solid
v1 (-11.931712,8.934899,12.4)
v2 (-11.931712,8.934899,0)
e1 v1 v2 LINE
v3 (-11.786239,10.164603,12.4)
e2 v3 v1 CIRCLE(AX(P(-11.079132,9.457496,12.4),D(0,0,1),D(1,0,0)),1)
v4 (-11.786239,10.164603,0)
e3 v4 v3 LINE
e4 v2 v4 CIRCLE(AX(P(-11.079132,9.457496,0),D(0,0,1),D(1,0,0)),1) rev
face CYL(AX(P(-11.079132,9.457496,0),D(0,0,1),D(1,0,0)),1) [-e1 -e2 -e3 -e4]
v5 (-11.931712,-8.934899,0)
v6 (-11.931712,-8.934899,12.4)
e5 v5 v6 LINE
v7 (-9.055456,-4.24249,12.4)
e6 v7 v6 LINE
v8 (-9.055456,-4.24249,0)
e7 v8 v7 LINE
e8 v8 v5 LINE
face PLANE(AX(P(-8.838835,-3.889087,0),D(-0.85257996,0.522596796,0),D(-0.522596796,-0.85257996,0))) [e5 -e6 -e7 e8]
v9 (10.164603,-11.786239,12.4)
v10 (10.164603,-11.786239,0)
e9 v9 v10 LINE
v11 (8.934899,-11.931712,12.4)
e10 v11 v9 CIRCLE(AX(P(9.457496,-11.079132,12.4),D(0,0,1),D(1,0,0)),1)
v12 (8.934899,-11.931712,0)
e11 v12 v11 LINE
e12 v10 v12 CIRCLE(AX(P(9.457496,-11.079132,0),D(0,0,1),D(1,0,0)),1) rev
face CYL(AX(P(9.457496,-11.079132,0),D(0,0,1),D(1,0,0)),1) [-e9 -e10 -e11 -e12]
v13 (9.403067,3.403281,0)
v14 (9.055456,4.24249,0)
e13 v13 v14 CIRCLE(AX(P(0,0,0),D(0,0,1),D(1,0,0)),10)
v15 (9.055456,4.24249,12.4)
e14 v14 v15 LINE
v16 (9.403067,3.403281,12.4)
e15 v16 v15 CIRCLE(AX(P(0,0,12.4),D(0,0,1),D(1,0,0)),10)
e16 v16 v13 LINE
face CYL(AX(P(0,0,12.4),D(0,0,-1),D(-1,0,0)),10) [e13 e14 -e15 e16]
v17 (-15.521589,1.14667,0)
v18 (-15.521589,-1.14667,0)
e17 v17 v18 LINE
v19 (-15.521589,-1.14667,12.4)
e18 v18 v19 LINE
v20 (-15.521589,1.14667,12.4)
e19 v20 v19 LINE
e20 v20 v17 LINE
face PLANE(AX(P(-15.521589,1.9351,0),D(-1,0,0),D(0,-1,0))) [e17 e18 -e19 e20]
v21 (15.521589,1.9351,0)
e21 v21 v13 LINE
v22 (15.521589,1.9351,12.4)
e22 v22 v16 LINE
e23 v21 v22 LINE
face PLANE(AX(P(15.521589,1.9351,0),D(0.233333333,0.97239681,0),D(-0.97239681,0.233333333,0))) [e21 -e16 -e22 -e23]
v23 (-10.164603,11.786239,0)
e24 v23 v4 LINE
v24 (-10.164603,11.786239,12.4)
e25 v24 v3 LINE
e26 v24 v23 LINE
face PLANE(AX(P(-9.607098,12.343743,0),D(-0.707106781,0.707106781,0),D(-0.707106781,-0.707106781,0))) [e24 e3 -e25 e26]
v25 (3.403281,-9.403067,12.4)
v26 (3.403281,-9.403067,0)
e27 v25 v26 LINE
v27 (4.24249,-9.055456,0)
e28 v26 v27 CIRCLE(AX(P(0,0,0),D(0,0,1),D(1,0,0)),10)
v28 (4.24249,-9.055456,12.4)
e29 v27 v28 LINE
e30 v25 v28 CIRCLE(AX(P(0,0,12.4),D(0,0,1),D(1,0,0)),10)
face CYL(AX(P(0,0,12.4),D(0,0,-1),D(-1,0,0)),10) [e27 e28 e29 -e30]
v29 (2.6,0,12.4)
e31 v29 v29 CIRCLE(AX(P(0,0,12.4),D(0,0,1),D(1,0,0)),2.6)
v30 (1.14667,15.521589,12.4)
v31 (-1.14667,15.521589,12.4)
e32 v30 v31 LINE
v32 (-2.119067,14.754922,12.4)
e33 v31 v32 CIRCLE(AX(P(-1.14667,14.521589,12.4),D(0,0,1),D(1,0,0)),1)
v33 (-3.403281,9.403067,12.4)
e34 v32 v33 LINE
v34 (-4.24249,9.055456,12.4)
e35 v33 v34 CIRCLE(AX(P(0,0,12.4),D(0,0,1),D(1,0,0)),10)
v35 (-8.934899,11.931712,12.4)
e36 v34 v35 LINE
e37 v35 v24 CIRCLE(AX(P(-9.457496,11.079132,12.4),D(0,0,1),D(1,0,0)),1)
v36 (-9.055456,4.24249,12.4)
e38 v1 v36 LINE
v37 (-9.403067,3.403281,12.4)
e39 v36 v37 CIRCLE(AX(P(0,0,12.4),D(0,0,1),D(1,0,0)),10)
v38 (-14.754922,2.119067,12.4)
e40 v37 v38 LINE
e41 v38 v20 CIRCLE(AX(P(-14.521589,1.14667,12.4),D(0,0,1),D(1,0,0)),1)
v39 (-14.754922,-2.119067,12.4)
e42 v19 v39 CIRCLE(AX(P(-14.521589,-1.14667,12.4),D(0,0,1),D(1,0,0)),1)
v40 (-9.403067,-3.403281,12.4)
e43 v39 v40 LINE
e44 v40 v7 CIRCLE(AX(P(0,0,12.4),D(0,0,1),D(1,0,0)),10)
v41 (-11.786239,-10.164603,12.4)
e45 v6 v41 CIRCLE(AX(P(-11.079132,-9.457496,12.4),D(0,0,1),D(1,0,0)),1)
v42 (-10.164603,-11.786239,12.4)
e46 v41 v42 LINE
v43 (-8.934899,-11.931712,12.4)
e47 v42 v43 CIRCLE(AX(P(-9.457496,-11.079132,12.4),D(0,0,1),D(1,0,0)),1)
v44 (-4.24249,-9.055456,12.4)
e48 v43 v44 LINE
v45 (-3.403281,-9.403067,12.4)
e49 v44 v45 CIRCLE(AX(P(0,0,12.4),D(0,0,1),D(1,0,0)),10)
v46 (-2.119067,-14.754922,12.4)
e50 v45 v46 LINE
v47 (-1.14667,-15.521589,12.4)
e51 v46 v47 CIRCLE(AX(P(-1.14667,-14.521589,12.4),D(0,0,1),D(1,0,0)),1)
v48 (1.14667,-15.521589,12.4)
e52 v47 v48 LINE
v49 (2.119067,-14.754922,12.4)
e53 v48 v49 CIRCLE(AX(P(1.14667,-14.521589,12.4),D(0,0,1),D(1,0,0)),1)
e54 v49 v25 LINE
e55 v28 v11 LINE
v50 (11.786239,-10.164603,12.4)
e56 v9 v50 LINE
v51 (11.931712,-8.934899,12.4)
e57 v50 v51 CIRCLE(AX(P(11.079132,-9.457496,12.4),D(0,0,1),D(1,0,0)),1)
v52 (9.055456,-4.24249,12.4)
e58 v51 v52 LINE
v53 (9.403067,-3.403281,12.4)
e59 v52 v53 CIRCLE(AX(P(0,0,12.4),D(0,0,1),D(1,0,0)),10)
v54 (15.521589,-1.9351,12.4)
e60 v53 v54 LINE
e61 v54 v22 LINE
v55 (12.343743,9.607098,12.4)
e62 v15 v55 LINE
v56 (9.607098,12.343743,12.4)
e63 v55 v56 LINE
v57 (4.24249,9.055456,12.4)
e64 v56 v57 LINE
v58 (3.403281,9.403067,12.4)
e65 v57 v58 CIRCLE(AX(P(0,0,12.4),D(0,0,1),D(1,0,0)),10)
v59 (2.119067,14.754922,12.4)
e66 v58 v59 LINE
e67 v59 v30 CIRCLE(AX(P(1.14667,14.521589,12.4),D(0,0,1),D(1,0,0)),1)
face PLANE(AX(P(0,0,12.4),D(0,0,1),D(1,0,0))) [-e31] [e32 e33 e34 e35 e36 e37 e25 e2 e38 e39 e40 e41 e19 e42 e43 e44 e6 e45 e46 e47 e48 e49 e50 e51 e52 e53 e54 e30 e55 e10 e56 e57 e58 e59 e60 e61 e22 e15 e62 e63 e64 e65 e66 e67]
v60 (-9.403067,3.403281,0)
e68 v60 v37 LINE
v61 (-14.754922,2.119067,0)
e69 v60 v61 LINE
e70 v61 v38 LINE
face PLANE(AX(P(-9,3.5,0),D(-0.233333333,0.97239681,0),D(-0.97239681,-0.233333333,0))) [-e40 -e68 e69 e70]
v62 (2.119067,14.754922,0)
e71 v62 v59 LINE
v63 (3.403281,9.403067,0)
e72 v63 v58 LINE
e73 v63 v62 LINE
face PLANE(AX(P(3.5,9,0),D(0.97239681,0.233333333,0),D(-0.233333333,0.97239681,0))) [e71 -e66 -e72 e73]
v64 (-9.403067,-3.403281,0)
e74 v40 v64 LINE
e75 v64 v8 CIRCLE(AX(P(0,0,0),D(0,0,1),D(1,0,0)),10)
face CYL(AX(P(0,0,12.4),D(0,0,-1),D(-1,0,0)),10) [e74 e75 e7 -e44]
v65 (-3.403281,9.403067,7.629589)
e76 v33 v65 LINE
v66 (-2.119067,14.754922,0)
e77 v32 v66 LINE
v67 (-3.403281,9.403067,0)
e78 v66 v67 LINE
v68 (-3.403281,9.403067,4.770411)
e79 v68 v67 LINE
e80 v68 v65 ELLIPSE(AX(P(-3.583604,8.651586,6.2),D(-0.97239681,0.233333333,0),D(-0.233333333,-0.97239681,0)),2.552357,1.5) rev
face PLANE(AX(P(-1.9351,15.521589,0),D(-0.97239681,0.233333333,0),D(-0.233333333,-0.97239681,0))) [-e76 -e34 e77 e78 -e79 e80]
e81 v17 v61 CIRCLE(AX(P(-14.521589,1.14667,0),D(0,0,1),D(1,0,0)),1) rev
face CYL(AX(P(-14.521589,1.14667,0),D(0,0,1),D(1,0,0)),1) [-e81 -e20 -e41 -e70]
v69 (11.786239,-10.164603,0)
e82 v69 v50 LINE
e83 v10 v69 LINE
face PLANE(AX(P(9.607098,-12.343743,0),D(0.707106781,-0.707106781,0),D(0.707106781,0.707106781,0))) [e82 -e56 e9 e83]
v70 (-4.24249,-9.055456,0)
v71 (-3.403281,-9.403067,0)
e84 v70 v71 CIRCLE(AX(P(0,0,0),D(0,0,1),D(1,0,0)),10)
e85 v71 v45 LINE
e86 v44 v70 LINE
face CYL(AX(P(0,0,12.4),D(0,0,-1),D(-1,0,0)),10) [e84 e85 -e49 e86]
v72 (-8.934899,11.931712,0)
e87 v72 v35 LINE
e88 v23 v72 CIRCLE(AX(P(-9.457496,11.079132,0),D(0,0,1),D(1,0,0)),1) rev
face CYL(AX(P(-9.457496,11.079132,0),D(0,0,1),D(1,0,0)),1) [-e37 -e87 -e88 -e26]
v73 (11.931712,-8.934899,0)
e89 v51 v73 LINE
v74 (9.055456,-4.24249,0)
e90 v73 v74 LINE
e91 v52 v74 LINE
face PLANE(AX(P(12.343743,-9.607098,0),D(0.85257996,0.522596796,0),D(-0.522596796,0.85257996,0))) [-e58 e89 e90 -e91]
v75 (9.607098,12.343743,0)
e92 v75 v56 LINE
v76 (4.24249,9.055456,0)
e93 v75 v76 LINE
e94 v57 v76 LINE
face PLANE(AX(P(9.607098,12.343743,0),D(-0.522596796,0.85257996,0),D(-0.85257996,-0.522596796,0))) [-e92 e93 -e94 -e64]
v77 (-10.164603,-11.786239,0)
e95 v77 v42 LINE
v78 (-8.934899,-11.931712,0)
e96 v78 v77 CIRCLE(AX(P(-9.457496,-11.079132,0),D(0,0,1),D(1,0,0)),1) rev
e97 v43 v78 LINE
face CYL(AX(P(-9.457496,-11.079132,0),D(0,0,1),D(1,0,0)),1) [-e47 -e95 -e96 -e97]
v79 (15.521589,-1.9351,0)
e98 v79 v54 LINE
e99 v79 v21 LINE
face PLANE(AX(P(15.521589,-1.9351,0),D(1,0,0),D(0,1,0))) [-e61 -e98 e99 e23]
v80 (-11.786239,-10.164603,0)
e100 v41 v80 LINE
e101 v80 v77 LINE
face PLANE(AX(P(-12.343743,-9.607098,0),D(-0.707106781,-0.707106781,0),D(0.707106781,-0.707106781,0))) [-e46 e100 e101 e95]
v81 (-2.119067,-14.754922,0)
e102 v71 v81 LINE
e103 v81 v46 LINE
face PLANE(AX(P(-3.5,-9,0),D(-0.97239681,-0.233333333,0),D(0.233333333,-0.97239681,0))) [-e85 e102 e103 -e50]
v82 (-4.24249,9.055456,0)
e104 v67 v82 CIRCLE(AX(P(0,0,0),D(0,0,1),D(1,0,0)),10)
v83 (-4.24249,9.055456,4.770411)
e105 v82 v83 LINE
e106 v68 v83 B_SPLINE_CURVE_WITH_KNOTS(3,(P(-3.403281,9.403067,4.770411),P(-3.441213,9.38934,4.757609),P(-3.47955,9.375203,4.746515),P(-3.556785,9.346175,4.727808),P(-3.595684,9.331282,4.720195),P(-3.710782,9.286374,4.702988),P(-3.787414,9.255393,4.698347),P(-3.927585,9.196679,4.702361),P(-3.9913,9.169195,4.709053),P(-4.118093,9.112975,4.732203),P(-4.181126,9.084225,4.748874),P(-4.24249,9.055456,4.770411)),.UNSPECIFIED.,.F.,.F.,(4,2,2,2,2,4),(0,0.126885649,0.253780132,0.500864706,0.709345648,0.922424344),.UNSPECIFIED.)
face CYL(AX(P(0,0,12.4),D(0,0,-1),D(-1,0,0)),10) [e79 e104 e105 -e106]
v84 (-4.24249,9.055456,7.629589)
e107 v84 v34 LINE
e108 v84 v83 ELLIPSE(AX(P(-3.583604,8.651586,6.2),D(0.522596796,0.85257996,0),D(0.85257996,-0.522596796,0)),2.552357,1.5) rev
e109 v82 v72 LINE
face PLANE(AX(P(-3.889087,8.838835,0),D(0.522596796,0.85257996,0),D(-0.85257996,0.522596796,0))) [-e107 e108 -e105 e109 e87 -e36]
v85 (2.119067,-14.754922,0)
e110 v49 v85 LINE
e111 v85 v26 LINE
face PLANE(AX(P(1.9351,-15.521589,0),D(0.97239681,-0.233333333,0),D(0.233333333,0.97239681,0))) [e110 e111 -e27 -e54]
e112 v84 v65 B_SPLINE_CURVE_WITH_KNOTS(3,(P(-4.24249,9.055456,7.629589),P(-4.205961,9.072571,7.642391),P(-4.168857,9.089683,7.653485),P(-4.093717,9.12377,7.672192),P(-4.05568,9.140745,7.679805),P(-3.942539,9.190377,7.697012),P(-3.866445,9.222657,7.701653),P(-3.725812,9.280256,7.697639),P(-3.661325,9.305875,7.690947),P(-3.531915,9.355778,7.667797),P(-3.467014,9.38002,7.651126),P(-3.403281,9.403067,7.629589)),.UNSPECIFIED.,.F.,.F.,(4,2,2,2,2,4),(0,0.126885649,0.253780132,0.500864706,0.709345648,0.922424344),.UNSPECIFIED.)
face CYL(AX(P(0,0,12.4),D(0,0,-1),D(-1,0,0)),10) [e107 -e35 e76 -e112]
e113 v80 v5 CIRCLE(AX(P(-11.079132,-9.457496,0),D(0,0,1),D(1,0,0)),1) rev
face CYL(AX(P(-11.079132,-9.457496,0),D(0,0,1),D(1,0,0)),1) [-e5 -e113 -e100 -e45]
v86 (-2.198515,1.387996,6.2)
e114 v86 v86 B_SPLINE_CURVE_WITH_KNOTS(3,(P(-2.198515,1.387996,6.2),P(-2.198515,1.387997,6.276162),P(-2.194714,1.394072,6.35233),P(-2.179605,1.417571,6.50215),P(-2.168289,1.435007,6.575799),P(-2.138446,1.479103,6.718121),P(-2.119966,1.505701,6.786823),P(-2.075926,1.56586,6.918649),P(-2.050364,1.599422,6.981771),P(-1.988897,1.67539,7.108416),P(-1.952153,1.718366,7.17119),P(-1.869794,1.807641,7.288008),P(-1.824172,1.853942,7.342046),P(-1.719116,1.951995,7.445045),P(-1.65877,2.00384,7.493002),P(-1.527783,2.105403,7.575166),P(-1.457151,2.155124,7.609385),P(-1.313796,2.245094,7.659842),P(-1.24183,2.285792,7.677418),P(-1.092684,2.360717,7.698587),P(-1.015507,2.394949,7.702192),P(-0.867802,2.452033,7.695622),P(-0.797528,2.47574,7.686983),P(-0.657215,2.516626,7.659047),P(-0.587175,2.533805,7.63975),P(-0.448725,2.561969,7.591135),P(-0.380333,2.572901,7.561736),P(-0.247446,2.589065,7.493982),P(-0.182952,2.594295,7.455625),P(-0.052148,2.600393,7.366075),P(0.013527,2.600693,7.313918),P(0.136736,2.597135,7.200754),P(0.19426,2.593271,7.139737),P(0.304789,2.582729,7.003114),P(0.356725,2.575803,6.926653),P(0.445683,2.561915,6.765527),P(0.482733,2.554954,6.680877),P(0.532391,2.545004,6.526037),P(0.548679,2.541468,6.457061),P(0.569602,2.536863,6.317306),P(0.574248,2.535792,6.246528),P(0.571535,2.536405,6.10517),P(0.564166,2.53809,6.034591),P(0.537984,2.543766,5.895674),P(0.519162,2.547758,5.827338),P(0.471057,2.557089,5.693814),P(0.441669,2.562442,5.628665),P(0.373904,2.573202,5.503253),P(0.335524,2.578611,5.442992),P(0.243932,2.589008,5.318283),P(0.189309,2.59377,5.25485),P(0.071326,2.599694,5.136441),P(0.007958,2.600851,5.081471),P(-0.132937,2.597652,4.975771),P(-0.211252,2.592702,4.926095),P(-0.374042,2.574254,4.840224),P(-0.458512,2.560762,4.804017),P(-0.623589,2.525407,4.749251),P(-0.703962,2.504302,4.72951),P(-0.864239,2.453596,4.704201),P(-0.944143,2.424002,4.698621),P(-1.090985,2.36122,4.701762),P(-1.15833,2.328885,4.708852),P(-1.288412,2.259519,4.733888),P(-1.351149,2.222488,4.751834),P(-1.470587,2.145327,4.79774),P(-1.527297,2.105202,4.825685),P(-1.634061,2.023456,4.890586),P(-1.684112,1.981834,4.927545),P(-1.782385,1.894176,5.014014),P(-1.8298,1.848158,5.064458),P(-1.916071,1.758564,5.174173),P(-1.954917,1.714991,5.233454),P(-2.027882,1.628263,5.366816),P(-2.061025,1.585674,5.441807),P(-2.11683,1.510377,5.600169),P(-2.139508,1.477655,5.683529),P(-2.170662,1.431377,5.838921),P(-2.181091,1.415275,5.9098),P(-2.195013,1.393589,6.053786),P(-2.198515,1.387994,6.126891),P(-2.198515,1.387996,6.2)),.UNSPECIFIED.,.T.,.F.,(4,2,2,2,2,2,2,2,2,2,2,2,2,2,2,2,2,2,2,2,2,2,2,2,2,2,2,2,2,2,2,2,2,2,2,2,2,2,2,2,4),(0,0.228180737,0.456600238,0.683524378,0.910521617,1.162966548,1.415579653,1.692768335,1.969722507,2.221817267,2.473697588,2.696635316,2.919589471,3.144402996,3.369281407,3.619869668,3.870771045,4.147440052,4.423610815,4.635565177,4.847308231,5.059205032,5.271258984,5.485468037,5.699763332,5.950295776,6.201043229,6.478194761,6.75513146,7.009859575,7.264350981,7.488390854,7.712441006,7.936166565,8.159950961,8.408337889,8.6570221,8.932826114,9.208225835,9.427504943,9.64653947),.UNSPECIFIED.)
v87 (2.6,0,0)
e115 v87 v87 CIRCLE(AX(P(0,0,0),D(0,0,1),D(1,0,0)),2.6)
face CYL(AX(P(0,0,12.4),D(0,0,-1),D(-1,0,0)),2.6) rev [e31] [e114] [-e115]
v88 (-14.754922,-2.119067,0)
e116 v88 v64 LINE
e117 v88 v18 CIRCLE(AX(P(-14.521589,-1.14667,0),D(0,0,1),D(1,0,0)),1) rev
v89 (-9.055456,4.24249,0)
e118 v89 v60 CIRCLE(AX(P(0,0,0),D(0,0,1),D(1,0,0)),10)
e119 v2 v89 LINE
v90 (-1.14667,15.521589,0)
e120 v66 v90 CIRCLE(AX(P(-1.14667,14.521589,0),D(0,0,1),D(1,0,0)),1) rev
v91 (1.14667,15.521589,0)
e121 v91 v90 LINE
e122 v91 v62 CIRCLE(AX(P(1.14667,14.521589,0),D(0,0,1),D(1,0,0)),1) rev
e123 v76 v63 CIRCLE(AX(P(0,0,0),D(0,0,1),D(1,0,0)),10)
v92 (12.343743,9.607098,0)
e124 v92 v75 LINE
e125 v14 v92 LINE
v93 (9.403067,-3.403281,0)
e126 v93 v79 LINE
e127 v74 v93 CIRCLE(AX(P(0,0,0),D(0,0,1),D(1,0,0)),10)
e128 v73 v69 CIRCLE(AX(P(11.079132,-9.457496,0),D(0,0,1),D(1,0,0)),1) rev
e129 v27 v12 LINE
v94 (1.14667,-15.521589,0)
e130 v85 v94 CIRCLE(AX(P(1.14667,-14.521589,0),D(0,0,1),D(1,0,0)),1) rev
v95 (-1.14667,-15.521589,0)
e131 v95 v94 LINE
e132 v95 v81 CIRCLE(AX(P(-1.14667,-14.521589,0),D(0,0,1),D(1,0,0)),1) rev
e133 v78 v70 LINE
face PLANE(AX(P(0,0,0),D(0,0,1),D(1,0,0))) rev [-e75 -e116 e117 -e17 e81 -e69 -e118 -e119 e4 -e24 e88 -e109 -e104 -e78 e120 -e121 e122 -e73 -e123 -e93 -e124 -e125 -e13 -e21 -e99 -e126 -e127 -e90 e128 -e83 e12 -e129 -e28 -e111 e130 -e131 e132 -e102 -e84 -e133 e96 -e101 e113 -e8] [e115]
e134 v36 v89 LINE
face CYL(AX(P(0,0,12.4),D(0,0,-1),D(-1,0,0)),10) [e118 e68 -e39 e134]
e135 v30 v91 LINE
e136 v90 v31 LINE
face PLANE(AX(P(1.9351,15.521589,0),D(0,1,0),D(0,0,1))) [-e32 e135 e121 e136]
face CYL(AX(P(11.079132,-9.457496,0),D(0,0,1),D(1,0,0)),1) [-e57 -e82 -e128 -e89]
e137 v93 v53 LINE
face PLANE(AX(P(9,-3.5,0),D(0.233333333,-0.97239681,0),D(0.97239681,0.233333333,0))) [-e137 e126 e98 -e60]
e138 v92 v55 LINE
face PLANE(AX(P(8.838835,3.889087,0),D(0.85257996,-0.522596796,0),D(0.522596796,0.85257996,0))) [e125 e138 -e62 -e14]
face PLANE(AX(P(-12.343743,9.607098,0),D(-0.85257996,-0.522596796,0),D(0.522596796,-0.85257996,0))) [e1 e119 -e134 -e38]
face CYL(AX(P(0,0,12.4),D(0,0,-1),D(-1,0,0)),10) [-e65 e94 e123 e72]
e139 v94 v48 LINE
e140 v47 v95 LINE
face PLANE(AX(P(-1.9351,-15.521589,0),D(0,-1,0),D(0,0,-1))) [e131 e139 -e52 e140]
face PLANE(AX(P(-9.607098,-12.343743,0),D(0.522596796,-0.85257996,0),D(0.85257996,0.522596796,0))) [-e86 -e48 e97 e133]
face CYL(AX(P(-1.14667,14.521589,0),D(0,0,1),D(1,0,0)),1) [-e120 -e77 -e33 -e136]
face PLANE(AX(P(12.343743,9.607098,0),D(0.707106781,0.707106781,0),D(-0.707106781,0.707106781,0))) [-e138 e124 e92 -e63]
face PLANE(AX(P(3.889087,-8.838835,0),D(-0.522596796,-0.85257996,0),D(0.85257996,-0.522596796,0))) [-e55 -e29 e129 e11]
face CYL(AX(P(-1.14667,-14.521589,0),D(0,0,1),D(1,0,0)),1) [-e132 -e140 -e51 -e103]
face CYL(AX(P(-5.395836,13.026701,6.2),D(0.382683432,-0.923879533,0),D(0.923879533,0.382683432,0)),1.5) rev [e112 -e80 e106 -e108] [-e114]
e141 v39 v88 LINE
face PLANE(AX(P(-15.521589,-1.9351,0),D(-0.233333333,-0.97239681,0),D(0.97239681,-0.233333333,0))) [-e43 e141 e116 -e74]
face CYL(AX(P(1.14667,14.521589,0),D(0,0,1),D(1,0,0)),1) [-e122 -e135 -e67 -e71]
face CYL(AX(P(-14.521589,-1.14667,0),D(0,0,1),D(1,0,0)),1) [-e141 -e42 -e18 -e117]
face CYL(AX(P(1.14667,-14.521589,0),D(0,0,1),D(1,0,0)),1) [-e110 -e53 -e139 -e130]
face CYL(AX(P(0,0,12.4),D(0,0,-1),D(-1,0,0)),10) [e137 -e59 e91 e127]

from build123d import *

# Parameters (mm, degrees)
SKETCH1_R                      = 10
SKETCH1_R_2                    = 2.6
BOSS_EXTRUDE1_DEPTH            = 12.4
BOSS_EXTRUDE2_DEPTH            = 6.2
CIRPATTERN1_DEPTH              = 12.4
CUT_EXTRUDE1_REACH             = 35.782
CUT_EXTRUDE1_END_RADIUS        = 2.6
SKETCH5_R                      = 1.5
CUT_EXTRUDE1_DIRECTION_2_DEPTH = 4.1
FILLET4_R                      = 1


# Read off the part's stored shape, not the designer's step: CirPattern1
with BuildPart() as part:
    # Sketch1 → Boss-Extrude1 (new body)
    with BuildSketch(Plane.XY):
        with Locations(Location((0, 0, 0), (0, 0, 180))):
            Circle(SKETCH1_R)
        with Locations(Location((0, 0, 0), (0, 0, 180))):
            Circle(SKETCH1_R_2, mode=Mode.SUBTRACT)
    extrude(amount=BOSS_EXTRUDE1_DEPTH)

    # Sketch2 → Boss-Extrude2 (add, symmetric)
    with BuildSketch(Plane.XY.offset(6.2)):
        Polygon((-1.935099749, 15.52158862), (-3.5, 9), (3.5, 9), (1.935099749, 15.52158862), align=None)
    extrude(amount=BOSS_EXTRUDE2_DEPTH, both=True)

    # CirPattern1 outline → CirPattern1 (add)
    with BuildSketch(Plane.XY):
        with BuildLine():
            Line((-9.607098413, 12.343742723), (-12.343742723, 9.607098413))
            Line((-12.343742723, 9.607098413), (-9.055455951, 4.242489544))
            ThreePointArc((-9.055455951, 4.242489544), (-7.071067812, 7.071067812), (-4.242489544, 9.055455951))
            Line((-4.242489544, 9.055455951), (-9.607098413, 12.343742723))
        make_face()
        with BuildLine():
            ThreePointArc((4.242489544, 9.055455951), (7.071067812, 7.071067812), (9.055455951, 4.242489544))
            Line((9.055455951, 4.242489544), (12.343742723, 9.607098413))
            Line((12.343742723, 9.607098413), (9.607098413, 12.343742723))
            Line((9.607098413, 12.343742723), (4.242489544, 9.055455951))
        make_face()
        with BuildLine():
            ThreePointArc((9.403067435, 3.403281184), (10, 0), (9.403067435, -3.403281184))
            Line((9.403067435, -3.403281184), (15.52158862, -1.935099749))
            Line((15.52158862, -1.935099749), (15.52158862, 1.935099749))
            Line((15.52158862, 1.935099749), (9.403067435, 3.403281184))
        make_face()
        with BuildLine():
            ThreePointArc((9.055455951, -4.242489544), (7.071067812, -7.071067812), (4.242489544, -9.05545595))
            Line((4.242489544, -9.05545595), (9.607098413, -12.343742723))
            Line((9.607098413, -12.343742723), (12.343742723, -9.607098413))
            Line((12.343742723, -9.607098413), (9.055455951, -4.242489544))
        make_face()
        with BuildLine():
            ThreePointArc((3.403281184, -9.403067435), (0, -10), (-3.403281184, -9.403067435))
            Line((-3.403281184, -9.403067435), (-1.935099749, -15.52158862))
            Line((-1.935099749, -15.52158862), (1.935099749, -15.52158862))
            Line((1.935099749, -15.52158862), (3.403281184, -9.403067435))
        make_face()
        with BuildLine():
            ThreePointArc((-4.242489544, -9.05545595), (-7.071067812, -7.071067812), (-9.055455951, -4.242489544))
            Line((-9.055455951, -4.242489544), (-12.343742723, -9.607098413))
            Line((-12.343742723, -9.607098413), (-9.607098413, -12.343742723))
            Line((-9.607098413, -12.343742723), (-4.242489544, -9.05545595))
        make_face()
        with BuildLine():
            ThreePointArc((-9.403067435, -3.403281184), (-10, 0), (-9.403067435, 3.403281184))
            Line((-9.403067435, 3.403281184), (-15.52158862, 1.935099749))
            Line((-15.52158862, 1.935099749), (-15.52158862, -1.935099749))
            Line((-15.52158862, -1.935099749), (-9.403067435, -3.403281184))
        make_face()
    extrude(amount=CIRPATTERN1_DEPTH)

    # Cut-Extrude1: up to this cylinder (the profile starts outside it)
    cut_extrude1_end = Plane(origin=(0, 0, 6.2), z_dir=(0, 0, -1)) * Cylinder(CUT_EXTRUDE1_END_RADIUS, 77.764, mode=Mode.PRIVATE)
    # Sketch5 → Cut-Extrude1 (cut, up to the surface)
    with BuildSketch(Plane(origin=(-3.826834324, 9.238795325, 0), x_dir=(0.9238795325112892, 0.3826834323650838, 0), z_dir=(-0.3826834323650838, 0.9238795325112892, 0)), mode=Mode.PRIVATE) as cut_extrude1_sk1:
        with Locations(Location((0, -6.2, 0), (0, 0, 72.37509472))):
            Circle(SKETCH5_R)
    cut_extrude1_tool1 = extrude(cut_extrude1_sk1.sketch, amount=-CUT_EXTRUDE1_REACH, mode=Mode.PRIVATE) - cut_extrude1_end
    add(cut_extrude1_tool1.solids().sort_by_distance((-3.826834, 9.238795, 6.2))[0], mode=Mode.SUBTRACT)

    # Sketch5 → Cut-Extrude1 direction 2 (cut)
    with BuildSketch(Plane(origin=(-3.826834324, 9.238795325, 0), x_dir=(0.9238795325112892, 0.3826834323650838, 0), z_dir=(-0.3826834323650838, 0.9238795325112892, 0))):
        with Locations(Location((0, -6.2, 0), (0, 0, 72.37509472))):
            Circle(SKETCH5_R)
    extrude(amount=CUT_EXTRUDE1_DIRECTION_2_DEPTH, mode=Mode.SUBTRACT)

    # Fillet4
    fillet4_edges = [part.edges().sort_by_distance(p)[0] for p in [
        (9.607098413, -12.343742723, 6.2),
        (12.343742723, -9.607098413, 6.2),
        (1.935099749, 15.52158862, 6.2),
        (-1.935099749, 15.52158862, 6.2),
        (-9.607098413, 12.343742723, 6.2),
        (-12.343742723, 9.607098413, 6.2),
        (-15.52158862, 1.935099749, 6.2),
        (-15.52158862, -1.935099749, 6.2),
        (-12.343742723, -9.607098413, 6.2),
        (-9.607098413, -12.343742723, 6.2),
        (-1.935099749, -15.52158862, 6.2),
        (1.935099749, -15.52158862, 6.2),
    ]]
    fillet(fillet4_edges, radius=FILLET4_R)


solid = part.part
